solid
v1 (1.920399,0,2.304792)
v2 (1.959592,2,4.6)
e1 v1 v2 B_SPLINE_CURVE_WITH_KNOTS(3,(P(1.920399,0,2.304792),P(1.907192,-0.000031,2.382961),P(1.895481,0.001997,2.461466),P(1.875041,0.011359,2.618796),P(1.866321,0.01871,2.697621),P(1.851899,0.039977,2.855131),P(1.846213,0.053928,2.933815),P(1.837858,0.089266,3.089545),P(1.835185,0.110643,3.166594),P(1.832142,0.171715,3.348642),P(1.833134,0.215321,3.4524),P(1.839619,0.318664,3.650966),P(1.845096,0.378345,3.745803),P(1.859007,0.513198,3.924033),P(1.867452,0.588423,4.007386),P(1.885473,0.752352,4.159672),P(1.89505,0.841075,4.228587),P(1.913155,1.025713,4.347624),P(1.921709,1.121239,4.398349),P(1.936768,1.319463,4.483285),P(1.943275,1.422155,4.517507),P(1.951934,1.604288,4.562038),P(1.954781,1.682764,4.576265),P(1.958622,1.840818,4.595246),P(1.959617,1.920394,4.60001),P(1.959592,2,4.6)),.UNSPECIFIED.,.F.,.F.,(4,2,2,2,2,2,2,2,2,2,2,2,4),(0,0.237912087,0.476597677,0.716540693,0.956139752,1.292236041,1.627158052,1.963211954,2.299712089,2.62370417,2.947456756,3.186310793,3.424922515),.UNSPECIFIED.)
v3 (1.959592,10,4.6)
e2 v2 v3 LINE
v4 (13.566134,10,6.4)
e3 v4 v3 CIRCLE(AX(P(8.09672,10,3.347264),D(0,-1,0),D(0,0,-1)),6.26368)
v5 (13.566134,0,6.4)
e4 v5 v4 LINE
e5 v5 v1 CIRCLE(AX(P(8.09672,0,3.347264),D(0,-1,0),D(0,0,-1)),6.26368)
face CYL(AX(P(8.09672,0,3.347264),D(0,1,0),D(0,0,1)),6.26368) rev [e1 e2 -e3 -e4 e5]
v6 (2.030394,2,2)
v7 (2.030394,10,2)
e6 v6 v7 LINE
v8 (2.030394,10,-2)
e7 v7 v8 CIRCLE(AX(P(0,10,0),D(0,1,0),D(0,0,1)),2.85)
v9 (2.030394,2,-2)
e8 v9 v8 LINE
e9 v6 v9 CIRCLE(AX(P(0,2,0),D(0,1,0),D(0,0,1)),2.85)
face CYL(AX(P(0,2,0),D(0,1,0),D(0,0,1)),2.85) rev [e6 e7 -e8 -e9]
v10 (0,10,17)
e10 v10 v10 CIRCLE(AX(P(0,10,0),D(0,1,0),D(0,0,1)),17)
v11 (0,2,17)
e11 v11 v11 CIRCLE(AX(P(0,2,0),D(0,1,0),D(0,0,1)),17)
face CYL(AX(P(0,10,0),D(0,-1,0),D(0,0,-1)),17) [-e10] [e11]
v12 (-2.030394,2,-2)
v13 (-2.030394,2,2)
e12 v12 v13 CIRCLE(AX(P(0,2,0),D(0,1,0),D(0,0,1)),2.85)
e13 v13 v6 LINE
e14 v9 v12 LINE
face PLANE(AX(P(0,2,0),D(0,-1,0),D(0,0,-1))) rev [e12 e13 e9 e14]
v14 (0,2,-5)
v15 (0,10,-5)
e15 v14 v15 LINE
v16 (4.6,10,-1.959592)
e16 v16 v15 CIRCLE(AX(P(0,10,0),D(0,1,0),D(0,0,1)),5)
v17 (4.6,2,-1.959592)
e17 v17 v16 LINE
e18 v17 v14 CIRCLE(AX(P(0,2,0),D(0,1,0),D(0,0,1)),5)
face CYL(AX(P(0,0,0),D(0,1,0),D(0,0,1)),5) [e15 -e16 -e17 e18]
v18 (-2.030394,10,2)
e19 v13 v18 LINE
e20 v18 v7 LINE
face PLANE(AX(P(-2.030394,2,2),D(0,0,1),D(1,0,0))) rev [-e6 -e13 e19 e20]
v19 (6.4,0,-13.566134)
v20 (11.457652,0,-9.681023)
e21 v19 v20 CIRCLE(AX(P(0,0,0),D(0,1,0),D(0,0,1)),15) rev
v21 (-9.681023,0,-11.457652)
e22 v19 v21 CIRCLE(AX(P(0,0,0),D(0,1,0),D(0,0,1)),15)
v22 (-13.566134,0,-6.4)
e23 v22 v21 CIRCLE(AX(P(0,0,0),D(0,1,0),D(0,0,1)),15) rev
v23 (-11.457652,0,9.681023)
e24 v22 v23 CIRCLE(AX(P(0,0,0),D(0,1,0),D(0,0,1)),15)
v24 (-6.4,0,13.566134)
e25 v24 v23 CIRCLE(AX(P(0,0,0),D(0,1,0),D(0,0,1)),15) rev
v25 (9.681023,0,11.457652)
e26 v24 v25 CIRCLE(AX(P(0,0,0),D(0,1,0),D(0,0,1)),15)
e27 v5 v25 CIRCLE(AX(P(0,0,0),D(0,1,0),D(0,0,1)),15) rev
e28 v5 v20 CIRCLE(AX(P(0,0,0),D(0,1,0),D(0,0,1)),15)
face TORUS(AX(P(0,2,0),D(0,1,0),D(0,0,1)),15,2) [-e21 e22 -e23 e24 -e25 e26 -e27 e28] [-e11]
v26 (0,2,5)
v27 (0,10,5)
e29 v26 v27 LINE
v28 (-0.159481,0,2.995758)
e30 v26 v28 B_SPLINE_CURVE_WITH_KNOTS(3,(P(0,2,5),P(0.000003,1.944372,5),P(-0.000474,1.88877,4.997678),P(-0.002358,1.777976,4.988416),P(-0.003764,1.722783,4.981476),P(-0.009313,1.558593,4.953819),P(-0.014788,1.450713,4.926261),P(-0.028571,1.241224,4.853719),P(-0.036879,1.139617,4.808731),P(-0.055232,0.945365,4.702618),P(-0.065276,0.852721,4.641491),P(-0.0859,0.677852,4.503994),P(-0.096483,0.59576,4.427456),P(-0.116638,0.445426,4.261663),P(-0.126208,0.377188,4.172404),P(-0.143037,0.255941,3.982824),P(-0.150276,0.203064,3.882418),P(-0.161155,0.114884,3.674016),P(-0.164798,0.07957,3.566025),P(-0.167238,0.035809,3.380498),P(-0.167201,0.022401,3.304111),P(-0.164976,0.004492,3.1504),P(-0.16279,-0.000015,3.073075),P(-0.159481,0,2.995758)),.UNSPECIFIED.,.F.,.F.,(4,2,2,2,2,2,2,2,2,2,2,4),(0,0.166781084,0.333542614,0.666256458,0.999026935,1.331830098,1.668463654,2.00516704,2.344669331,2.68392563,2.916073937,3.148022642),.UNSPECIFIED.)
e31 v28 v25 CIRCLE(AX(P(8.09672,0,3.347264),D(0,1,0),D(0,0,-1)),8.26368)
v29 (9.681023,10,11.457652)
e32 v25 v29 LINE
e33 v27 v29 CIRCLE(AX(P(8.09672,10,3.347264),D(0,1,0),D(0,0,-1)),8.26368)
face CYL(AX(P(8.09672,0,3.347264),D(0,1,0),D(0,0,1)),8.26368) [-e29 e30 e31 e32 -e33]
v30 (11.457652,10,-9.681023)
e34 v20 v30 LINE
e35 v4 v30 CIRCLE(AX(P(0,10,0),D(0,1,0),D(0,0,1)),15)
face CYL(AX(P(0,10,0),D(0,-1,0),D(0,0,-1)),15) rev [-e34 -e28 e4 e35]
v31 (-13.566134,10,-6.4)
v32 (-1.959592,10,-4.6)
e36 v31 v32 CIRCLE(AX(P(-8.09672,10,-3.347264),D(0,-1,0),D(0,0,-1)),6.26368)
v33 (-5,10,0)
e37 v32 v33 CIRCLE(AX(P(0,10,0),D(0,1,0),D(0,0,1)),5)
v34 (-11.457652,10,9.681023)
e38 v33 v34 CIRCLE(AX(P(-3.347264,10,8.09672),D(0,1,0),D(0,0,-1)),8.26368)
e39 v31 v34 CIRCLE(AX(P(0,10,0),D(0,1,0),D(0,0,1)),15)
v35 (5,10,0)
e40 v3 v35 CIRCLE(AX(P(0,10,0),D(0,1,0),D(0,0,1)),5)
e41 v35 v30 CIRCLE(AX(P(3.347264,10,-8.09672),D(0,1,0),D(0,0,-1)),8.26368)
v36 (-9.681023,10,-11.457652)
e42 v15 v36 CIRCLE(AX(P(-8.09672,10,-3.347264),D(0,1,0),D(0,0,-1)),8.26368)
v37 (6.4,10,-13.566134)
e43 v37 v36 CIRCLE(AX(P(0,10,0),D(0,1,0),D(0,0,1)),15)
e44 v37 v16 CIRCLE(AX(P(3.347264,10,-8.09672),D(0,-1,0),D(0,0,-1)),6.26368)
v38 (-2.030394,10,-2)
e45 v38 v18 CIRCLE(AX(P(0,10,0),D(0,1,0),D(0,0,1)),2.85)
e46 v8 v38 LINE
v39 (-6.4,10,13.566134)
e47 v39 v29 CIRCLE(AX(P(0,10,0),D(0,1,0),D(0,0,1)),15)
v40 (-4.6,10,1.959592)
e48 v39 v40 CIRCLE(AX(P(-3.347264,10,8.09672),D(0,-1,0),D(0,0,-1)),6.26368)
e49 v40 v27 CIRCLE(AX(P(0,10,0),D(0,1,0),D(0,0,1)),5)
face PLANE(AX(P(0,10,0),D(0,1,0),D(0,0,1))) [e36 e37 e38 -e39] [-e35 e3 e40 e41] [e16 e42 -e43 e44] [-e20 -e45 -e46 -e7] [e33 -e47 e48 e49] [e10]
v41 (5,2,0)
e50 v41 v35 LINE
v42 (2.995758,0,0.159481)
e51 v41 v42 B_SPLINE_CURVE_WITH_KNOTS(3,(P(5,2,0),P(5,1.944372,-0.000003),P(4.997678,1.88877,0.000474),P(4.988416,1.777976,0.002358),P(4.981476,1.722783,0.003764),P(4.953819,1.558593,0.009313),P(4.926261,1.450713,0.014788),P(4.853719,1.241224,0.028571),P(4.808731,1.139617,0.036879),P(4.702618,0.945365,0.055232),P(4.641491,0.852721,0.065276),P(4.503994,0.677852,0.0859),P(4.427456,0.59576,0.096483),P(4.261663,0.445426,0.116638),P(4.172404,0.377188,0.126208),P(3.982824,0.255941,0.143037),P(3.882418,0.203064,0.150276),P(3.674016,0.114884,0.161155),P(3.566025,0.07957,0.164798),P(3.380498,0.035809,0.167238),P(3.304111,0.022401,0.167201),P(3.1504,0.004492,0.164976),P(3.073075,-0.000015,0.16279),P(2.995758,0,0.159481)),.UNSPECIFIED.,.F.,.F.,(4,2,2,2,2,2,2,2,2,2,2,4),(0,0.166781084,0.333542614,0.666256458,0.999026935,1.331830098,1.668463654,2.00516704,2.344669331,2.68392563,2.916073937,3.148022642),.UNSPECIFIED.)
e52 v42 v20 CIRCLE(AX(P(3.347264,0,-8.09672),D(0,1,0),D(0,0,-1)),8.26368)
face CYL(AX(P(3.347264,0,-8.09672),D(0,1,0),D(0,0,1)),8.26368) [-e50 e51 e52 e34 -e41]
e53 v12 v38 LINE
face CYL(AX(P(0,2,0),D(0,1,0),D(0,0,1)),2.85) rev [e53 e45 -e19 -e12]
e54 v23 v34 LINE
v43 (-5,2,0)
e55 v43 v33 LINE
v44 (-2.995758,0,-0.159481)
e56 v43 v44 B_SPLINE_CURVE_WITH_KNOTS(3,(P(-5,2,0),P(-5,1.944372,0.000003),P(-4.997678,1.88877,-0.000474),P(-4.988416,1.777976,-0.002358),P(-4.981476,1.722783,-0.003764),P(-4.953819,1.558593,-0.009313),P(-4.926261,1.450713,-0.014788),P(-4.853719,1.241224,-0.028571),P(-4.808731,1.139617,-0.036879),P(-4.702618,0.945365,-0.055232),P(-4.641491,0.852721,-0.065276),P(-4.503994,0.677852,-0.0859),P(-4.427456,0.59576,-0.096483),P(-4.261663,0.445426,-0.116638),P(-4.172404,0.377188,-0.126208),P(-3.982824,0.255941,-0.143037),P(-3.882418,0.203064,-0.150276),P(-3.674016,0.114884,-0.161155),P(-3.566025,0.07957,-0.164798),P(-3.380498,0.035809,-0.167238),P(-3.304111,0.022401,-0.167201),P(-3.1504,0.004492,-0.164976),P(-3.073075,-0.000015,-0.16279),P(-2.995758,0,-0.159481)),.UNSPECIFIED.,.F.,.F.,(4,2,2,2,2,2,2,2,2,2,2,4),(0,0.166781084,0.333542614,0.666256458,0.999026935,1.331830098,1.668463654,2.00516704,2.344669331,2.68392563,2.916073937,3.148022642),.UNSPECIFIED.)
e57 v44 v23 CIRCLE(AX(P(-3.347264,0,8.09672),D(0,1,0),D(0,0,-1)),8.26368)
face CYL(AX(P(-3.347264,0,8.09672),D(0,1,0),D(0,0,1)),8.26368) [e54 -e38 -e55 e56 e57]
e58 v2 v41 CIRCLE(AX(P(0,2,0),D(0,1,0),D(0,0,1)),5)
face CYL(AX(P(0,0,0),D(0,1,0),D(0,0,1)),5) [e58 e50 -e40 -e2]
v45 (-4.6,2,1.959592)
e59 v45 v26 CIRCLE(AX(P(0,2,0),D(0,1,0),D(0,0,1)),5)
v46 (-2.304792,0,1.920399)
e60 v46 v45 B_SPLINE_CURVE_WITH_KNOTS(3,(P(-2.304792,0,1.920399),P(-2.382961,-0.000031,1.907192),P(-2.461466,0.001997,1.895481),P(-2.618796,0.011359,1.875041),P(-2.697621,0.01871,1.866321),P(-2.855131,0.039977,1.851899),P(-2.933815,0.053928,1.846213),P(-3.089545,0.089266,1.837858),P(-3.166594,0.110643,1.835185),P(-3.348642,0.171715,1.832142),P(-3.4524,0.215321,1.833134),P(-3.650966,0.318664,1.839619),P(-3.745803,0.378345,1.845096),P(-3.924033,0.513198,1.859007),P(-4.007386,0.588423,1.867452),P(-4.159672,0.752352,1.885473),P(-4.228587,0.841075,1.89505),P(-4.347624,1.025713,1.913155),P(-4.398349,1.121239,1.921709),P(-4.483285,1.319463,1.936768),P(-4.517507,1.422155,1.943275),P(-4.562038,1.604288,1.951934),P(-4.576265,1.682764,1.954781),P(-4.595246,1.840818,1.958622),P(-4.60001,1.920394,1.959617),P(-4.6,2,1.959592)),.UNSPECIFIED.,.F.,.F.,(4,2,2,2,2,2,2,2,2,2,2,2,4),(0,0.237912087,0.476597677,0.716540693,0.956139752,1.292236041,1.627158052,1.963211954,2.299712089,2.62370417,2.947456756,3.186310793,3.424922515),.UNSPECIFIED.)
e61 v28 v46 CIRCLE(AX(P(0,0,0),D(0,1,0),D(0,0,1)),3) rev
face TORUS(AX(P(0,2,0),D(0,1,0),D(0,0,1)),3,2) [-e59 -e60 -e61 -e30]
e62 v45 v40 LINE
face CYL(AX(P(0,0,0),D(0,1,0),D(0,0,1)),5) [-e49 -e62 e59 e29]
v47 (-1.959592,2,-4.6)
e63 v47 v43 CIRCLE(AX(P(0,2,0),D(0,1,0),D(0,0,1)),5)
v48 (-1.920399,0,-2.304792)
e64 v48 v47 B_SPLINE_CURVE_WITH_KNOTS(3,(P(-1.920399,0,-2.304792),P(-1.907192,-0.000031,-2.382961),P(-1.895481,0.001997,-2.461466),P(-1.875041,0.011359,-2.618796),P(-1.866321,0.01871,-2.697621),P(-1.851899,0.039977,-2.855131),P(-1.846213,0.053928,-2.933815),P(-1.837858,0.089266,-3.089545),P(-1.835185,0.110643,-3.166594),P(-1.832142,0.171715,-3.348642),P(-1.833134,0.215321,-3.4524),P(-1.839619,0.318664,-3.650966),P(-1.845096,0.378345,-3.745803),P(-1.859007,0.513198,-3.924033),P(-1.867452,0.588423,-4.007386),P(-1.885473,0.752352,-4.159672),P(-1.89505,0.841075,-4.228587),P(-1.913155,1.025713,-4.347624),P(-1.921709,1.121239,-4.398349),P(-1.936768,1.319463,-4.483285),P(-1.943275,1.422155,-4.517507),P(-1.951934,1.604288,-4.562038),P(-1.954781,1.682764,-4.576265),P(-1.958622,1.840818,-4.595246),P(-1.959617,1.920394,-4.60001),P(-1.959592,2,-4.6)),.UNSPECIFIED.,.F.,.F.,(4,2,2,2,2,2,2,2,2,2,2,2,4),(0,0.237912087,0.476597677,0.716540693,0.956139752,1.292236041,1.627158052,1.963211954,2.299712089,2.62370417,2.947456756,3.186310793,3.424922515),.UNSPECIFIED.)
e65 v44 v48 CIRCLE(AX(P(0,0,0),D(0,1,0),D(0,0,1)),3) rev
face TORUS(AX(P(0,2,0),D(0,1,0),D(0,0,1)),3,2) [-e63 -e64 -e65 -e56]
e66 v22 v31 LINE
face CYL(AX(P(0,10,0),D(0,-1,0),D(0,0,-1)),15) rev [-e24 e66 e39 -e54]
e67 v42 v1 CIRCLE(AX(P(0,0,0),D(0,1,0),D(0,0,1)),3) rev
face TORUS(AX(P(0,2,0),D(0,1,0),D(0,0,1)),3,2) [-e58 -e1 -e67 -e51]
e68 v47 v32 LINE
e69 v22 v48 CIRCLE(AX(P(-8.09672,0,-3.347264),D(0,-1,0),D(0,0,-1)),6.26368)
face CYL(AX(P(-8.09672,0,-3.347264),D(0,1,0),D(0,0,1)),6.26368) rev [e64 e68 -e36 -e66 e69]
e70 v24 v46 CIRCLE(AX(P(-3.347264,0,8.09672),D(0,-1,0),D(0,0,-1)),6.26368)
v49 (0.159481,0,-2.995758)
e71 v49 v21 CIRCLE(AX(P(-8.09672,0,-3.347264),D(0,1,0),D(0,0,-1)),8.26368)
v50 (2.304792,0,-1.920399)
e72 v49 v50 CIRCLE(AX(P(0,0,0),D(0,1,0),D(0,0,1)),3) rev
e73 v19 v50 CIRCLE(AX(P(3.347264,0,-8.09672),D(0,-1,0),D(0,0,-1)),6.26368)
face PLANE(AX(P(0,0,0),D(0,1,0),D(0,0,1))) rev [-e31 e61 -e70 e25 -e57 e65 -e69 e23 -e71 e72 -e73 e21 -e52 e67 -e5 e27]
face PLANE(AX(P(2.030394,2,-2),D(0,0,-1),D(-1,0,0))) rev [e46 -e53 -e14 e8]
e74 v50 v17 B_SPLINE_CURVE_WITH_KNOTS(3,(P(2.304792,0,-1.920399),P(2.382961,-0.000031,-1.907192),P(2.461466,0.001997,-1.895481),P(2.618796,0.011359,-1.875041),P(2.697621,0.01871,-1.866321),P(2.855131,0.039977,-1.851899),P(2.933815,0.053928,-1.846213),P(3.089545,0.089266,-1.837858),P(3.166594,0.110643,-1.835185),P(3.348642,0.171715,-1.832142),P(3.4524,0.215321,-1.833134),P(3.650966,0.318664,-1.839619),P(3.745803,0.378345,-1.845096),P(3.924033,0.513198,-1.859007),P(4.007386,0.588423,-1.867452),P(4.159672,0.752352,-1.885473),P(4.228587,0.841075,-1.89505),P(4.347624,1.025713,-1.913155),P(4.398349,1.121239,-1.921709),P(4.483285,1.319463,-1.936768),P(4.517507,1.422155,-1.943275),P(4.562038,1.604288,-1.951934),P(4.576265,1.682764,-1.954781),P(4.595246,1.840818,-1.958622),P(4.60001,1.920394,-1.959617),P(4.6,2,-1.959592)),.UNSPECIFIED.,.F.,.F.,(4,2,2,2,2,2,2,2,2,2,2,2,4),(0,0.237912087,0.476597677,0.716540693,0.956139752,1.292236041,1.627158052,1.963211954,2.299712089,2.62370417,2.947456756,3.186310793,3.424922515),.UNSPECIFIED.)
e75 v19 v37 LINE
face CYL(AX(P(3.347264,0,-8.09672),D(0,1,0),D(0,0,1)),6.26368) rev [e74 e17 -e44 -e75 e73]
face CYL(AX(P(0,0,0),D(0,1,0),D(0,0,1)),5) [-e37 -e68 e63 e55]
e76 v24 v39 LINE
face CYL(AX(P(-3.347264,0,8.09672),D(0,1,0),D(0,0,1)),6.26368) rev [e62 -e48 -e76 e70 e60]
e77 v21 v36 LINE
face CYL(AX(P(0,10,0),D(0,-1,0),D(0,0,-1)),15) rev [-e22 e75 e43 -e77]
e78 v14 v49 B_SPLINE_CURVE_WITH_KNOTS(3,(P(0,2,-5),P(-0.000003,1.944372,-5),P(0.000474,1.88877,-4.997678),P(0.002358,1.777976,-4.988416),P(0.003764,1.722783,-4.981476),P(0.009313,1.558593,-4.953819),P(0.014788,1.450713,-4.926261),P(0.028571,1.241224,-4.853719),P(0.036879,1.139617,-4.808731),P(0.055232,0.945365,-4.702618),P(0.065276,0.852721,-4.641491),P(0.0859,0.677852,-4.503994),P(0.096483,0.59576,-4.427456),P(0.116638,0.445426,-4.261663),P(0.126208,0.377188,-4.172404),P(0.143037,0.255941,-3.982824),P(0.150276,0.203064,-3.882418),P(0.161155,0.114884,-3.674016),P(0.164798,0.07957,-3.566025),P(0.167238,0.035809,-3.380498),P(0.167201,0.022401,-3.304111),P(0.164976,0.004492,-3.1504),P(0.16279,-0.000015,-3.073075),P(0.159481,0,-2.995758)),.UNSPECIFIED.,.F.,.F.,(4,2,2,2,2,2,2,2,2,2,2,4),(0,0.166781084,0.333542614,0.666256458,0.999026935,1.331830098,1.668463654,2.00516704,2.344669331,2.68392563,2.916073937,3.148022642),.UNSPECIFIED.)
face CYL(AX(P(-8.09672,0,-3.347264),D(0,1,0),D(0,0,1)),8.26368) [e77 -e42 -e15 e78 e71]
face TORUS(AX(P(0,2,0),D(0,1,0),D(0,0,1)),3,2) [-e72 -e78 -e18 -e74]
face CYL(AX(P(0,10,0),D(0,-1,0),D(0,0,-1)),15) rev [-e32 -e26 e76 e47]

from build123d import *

# Parameters (mm, degrees)
SKETCH1_R           = 17
SKETCH1_R_2         = 14.999999999999998
BOSS_EXTRUDE1_DEPTH = 10
SKETCH2_R           = 5
BOSS_EXTRUDE2_DEPTH = 10
BOSS_EXTRUDE3_START = -10
BOSS_EXTRUDE3_DEPTH = 10
FILLET1_R           = 2
BOSS_EXTRUDE4_START = -2
BOSS_EXTRUDE4_DEPTH = 2
FILLET2_R           = 2
CUT_EXTRUDE1_DEPTH  = 8


with BuildPart() as part:
    # Sketch1 → Boss-Extrude1 (new body)
    with BuildSketch(Plane(origin=(0, 0, 0), x_dir=(1, 0, 0), z_dir=(0, 1, 0))):
        with Locations(Location((0, 0, 0), (0, 0, 270))):
            Circle(SKETCH1_R)
        with Locations(Location((0, 0, 0), (0, 0, 270))):
            Circle(SKETCH1_R_2, mode=Mode.SUBTRACT)
    extrude(amount=BOSS_EXTRUDE1_DEPTH)



with BuildPart() as body_2:
    # Sketch2 → Boss-Extrude2 (new body)
    with BuildSketch(Plane(origin=(0, 10, 0), x_dir=(1, 0, 0), z_dir=(0, 1, 0))):
        with Locations(Location((0, 0, 0), (0, 0, 270))):
            Circle(SKETCH2_R)
        with BuildLine():
            Line((-1.9448650338776723, 1.8000000000000003), (1.9448650338776723, 1.8000000000000003))
            ThreePointArc((1.9448650338776723, 1.8000000000000003), (2.65, 2.9e-16), (1.9448650338776725, -1.8))
            Line((1.9448650338776725, -1.8), (-1.9448650338776725, -1.8))
            ThreePointArc((-1.9448650338776725, -1.8), (-2.65, 3.2e-16), (-1.9448650338776723, 1.8000000000000003))
        make_face(mode=Mode.SUBTRACT)
    extrude(amount=-BOSS_EXTRUDE2_DEPTH)


with BuildPart() as part_1:
    add(part.part)

    add(body_2.part)  # Boss-Extrude3 merges body 2
    # Sketch3 → Boss-Extrude3 (add)
    with BuildSketch(Plane(origin=(0, 10, 0), x_dir=(1, 0, 0), z_dir=(0, 1, 0)).offset(BOSS_EXTRUDE3_START)):
        with BuildLine():
            ThreePointArc((-13.566134305689296, 6.4), (-7.136792678521299, 9.536951322914675), (-1.9595917942265426, 4.6000000000000005))
            ThreePointArc((-1.9595917942265426, 4.6000000000000005), (-1.0000000000000004, 4.898979485566357), (0, 5.000000000000001))
            ThreePointArc((0, 5.000000000000001), (-3.511067317848477, 10.221869444049297), (-9.681023203858528, 11.457652016288186))
            ThreePointArc((-9.681023203858528, 11.457652016288186), (-11.895484187198832, 9.137694236080705), (-13.566134305689296, 6.4))
        make_face()
        with BuildLine():
            ThreePointArc((6.400000000000048, 13.566134305689273), (9.5369513229147, 7.1367926785212665), (4.600000000000008, 1.9595917942265266))
            ThreePointArc((4.600000000000008, 1.9595917942265266), (4.898979485566361, 0.9999999999999829), (5.000000000000001, -1.746e-14))
            ThreePointArc((5.000000000000001, -1.746e-14), (10.221869444049313, 3.5110673178484406), (11.45765201628822, 9.681023203858487))
            ThreePointArc((11.45765201628822, 9.681023203858487), (9.137694236080746, 11.895484187198797), (6.400000000000048, 13.566134305689273))
        make_face()
        with BuildLine():
            ThreePointArc((13.56613430568925, -6.4000000000000945), (7.136792678521233, -9.536951322914723), (1.9595917942265106, -4.600000000000015))
            ThreePointArc((1.9595917942265106, -4.600000000000015), (0.9999999999999661, -4.898979485566364), (-3.491e-14, -5.000000000000001))
            ThreePointArc((-3.491e-14, -5.000000000000001), (3.511067317848407, -10.221869444049325), (9.681023203858448, -11.457652016288254))
            ThreePointArc((9.681023203858448, -11.457652016288254), (11.895484187198766, -9.137694236080788), (13.56613430568925, -6.4000000000000945))
        make_face()
        with BuildLine():
            ThreePointArc((-6.4000000000001425, -13.566134305689229), (-9.53695132291475, -7.1367926785212), (-4.600000000000022, -1.9595917942264942))
            ThreePointArc((-4.600000000000022, -1.9595917942264942), (-4.898979485566368, -0.9999999999999478), (-5.000000000000001, 5.281e-14))
            ThreePointArc((-5.000000000000001, 5.281e-14), (-10.221869444049336, -3.5110673178483705), (-11.457652016288288, -9.681023203858407))
            ThreePointArc((-11.457652016288288, -9.681023203858407), (-9.13769423608083, -11.895484187198734), (-6.4000000000001425, -13.566134305689229))
        make_face()
    extrude(amount=BOSS_EXTRUDE3_DEPTH)

    # Fillet1
    fillet1_edges = [part_1.edges().sort_by_distance(p)[0] for p in [
        (5.2e-15, 0, -17),
    ]]
    fillet(fillet1_edges, radius=FILLET1_R - 0.0001)  # a hair under: the kernel refuses the full size

    # Sketch4 → Boss-Extrude4 (add)
    with BuildSketch(Plane.XZ.offset(BOSS_EXTRUDE4_START)):
        with BuildLine():
            Line((-1.9448650338776725, 1.8), (1.9448650338776725, 1.8))
            ThreePointArc((1.9448650338776725, 1.8), (2.65, 0), (1.9448650338776723, -1.8000000000000003))
            Line((1.9448650338776723, -1.8000000000000003), (-1.9448650338776723, -1.8000000000000003))
            ThreePointArc((-1.9448650338776723, -1.8000000000000003), (-2.65, 3.2e-16), (-1.9448650338776725, 1.8))
        make_face()
    extrude(amount=BOSS_EXTRUDE4_DEPTH)

    # Fillet2
    fillet2_edges = [part_1.edges().sort_by_distance(p)[0] for p in [
        (-4.171208396324286, 0, -2.7569948339512305),
        (2.7569948339512154, 0, -4.171208396324297),
        (4.171208396324286, 0, 2.7569948339512305),
        (-2.7569948339512305, 0, 4.171208396324286),
    ]]
    fillet(fillet2_edges, radius=FILLET2_R)

    # Sketch5 → Cut-Extrude1 (cut)
    with BuildSketch(Plane(origin=(0, 10, 0), x_dir=(1, 0, 0), z_dir=(0, 1, 0))):
        with BuildLine():
            Line((-2.030394050424718, -2), (2.0303940504247175, -2.0000000000000004))
            ThreePointArc((2.0303940504247175, -2.0000000000000004), (2.850000000000016, -3.2e-16), (2.030394050424718, 2))
            Line((2.030394050424718, 2), (-2.030394050424718, 2))
            ThreePointArc((-2.030394050424718, 2), (-2.850000000000016, 3.5e-16), (-2.030394050424718, -2))
        make_face()
    extrude(amount=-CUT_EXTRUDE1_DEPTH, mode=Mode.SUBTRACT)


solid = part_1.part
